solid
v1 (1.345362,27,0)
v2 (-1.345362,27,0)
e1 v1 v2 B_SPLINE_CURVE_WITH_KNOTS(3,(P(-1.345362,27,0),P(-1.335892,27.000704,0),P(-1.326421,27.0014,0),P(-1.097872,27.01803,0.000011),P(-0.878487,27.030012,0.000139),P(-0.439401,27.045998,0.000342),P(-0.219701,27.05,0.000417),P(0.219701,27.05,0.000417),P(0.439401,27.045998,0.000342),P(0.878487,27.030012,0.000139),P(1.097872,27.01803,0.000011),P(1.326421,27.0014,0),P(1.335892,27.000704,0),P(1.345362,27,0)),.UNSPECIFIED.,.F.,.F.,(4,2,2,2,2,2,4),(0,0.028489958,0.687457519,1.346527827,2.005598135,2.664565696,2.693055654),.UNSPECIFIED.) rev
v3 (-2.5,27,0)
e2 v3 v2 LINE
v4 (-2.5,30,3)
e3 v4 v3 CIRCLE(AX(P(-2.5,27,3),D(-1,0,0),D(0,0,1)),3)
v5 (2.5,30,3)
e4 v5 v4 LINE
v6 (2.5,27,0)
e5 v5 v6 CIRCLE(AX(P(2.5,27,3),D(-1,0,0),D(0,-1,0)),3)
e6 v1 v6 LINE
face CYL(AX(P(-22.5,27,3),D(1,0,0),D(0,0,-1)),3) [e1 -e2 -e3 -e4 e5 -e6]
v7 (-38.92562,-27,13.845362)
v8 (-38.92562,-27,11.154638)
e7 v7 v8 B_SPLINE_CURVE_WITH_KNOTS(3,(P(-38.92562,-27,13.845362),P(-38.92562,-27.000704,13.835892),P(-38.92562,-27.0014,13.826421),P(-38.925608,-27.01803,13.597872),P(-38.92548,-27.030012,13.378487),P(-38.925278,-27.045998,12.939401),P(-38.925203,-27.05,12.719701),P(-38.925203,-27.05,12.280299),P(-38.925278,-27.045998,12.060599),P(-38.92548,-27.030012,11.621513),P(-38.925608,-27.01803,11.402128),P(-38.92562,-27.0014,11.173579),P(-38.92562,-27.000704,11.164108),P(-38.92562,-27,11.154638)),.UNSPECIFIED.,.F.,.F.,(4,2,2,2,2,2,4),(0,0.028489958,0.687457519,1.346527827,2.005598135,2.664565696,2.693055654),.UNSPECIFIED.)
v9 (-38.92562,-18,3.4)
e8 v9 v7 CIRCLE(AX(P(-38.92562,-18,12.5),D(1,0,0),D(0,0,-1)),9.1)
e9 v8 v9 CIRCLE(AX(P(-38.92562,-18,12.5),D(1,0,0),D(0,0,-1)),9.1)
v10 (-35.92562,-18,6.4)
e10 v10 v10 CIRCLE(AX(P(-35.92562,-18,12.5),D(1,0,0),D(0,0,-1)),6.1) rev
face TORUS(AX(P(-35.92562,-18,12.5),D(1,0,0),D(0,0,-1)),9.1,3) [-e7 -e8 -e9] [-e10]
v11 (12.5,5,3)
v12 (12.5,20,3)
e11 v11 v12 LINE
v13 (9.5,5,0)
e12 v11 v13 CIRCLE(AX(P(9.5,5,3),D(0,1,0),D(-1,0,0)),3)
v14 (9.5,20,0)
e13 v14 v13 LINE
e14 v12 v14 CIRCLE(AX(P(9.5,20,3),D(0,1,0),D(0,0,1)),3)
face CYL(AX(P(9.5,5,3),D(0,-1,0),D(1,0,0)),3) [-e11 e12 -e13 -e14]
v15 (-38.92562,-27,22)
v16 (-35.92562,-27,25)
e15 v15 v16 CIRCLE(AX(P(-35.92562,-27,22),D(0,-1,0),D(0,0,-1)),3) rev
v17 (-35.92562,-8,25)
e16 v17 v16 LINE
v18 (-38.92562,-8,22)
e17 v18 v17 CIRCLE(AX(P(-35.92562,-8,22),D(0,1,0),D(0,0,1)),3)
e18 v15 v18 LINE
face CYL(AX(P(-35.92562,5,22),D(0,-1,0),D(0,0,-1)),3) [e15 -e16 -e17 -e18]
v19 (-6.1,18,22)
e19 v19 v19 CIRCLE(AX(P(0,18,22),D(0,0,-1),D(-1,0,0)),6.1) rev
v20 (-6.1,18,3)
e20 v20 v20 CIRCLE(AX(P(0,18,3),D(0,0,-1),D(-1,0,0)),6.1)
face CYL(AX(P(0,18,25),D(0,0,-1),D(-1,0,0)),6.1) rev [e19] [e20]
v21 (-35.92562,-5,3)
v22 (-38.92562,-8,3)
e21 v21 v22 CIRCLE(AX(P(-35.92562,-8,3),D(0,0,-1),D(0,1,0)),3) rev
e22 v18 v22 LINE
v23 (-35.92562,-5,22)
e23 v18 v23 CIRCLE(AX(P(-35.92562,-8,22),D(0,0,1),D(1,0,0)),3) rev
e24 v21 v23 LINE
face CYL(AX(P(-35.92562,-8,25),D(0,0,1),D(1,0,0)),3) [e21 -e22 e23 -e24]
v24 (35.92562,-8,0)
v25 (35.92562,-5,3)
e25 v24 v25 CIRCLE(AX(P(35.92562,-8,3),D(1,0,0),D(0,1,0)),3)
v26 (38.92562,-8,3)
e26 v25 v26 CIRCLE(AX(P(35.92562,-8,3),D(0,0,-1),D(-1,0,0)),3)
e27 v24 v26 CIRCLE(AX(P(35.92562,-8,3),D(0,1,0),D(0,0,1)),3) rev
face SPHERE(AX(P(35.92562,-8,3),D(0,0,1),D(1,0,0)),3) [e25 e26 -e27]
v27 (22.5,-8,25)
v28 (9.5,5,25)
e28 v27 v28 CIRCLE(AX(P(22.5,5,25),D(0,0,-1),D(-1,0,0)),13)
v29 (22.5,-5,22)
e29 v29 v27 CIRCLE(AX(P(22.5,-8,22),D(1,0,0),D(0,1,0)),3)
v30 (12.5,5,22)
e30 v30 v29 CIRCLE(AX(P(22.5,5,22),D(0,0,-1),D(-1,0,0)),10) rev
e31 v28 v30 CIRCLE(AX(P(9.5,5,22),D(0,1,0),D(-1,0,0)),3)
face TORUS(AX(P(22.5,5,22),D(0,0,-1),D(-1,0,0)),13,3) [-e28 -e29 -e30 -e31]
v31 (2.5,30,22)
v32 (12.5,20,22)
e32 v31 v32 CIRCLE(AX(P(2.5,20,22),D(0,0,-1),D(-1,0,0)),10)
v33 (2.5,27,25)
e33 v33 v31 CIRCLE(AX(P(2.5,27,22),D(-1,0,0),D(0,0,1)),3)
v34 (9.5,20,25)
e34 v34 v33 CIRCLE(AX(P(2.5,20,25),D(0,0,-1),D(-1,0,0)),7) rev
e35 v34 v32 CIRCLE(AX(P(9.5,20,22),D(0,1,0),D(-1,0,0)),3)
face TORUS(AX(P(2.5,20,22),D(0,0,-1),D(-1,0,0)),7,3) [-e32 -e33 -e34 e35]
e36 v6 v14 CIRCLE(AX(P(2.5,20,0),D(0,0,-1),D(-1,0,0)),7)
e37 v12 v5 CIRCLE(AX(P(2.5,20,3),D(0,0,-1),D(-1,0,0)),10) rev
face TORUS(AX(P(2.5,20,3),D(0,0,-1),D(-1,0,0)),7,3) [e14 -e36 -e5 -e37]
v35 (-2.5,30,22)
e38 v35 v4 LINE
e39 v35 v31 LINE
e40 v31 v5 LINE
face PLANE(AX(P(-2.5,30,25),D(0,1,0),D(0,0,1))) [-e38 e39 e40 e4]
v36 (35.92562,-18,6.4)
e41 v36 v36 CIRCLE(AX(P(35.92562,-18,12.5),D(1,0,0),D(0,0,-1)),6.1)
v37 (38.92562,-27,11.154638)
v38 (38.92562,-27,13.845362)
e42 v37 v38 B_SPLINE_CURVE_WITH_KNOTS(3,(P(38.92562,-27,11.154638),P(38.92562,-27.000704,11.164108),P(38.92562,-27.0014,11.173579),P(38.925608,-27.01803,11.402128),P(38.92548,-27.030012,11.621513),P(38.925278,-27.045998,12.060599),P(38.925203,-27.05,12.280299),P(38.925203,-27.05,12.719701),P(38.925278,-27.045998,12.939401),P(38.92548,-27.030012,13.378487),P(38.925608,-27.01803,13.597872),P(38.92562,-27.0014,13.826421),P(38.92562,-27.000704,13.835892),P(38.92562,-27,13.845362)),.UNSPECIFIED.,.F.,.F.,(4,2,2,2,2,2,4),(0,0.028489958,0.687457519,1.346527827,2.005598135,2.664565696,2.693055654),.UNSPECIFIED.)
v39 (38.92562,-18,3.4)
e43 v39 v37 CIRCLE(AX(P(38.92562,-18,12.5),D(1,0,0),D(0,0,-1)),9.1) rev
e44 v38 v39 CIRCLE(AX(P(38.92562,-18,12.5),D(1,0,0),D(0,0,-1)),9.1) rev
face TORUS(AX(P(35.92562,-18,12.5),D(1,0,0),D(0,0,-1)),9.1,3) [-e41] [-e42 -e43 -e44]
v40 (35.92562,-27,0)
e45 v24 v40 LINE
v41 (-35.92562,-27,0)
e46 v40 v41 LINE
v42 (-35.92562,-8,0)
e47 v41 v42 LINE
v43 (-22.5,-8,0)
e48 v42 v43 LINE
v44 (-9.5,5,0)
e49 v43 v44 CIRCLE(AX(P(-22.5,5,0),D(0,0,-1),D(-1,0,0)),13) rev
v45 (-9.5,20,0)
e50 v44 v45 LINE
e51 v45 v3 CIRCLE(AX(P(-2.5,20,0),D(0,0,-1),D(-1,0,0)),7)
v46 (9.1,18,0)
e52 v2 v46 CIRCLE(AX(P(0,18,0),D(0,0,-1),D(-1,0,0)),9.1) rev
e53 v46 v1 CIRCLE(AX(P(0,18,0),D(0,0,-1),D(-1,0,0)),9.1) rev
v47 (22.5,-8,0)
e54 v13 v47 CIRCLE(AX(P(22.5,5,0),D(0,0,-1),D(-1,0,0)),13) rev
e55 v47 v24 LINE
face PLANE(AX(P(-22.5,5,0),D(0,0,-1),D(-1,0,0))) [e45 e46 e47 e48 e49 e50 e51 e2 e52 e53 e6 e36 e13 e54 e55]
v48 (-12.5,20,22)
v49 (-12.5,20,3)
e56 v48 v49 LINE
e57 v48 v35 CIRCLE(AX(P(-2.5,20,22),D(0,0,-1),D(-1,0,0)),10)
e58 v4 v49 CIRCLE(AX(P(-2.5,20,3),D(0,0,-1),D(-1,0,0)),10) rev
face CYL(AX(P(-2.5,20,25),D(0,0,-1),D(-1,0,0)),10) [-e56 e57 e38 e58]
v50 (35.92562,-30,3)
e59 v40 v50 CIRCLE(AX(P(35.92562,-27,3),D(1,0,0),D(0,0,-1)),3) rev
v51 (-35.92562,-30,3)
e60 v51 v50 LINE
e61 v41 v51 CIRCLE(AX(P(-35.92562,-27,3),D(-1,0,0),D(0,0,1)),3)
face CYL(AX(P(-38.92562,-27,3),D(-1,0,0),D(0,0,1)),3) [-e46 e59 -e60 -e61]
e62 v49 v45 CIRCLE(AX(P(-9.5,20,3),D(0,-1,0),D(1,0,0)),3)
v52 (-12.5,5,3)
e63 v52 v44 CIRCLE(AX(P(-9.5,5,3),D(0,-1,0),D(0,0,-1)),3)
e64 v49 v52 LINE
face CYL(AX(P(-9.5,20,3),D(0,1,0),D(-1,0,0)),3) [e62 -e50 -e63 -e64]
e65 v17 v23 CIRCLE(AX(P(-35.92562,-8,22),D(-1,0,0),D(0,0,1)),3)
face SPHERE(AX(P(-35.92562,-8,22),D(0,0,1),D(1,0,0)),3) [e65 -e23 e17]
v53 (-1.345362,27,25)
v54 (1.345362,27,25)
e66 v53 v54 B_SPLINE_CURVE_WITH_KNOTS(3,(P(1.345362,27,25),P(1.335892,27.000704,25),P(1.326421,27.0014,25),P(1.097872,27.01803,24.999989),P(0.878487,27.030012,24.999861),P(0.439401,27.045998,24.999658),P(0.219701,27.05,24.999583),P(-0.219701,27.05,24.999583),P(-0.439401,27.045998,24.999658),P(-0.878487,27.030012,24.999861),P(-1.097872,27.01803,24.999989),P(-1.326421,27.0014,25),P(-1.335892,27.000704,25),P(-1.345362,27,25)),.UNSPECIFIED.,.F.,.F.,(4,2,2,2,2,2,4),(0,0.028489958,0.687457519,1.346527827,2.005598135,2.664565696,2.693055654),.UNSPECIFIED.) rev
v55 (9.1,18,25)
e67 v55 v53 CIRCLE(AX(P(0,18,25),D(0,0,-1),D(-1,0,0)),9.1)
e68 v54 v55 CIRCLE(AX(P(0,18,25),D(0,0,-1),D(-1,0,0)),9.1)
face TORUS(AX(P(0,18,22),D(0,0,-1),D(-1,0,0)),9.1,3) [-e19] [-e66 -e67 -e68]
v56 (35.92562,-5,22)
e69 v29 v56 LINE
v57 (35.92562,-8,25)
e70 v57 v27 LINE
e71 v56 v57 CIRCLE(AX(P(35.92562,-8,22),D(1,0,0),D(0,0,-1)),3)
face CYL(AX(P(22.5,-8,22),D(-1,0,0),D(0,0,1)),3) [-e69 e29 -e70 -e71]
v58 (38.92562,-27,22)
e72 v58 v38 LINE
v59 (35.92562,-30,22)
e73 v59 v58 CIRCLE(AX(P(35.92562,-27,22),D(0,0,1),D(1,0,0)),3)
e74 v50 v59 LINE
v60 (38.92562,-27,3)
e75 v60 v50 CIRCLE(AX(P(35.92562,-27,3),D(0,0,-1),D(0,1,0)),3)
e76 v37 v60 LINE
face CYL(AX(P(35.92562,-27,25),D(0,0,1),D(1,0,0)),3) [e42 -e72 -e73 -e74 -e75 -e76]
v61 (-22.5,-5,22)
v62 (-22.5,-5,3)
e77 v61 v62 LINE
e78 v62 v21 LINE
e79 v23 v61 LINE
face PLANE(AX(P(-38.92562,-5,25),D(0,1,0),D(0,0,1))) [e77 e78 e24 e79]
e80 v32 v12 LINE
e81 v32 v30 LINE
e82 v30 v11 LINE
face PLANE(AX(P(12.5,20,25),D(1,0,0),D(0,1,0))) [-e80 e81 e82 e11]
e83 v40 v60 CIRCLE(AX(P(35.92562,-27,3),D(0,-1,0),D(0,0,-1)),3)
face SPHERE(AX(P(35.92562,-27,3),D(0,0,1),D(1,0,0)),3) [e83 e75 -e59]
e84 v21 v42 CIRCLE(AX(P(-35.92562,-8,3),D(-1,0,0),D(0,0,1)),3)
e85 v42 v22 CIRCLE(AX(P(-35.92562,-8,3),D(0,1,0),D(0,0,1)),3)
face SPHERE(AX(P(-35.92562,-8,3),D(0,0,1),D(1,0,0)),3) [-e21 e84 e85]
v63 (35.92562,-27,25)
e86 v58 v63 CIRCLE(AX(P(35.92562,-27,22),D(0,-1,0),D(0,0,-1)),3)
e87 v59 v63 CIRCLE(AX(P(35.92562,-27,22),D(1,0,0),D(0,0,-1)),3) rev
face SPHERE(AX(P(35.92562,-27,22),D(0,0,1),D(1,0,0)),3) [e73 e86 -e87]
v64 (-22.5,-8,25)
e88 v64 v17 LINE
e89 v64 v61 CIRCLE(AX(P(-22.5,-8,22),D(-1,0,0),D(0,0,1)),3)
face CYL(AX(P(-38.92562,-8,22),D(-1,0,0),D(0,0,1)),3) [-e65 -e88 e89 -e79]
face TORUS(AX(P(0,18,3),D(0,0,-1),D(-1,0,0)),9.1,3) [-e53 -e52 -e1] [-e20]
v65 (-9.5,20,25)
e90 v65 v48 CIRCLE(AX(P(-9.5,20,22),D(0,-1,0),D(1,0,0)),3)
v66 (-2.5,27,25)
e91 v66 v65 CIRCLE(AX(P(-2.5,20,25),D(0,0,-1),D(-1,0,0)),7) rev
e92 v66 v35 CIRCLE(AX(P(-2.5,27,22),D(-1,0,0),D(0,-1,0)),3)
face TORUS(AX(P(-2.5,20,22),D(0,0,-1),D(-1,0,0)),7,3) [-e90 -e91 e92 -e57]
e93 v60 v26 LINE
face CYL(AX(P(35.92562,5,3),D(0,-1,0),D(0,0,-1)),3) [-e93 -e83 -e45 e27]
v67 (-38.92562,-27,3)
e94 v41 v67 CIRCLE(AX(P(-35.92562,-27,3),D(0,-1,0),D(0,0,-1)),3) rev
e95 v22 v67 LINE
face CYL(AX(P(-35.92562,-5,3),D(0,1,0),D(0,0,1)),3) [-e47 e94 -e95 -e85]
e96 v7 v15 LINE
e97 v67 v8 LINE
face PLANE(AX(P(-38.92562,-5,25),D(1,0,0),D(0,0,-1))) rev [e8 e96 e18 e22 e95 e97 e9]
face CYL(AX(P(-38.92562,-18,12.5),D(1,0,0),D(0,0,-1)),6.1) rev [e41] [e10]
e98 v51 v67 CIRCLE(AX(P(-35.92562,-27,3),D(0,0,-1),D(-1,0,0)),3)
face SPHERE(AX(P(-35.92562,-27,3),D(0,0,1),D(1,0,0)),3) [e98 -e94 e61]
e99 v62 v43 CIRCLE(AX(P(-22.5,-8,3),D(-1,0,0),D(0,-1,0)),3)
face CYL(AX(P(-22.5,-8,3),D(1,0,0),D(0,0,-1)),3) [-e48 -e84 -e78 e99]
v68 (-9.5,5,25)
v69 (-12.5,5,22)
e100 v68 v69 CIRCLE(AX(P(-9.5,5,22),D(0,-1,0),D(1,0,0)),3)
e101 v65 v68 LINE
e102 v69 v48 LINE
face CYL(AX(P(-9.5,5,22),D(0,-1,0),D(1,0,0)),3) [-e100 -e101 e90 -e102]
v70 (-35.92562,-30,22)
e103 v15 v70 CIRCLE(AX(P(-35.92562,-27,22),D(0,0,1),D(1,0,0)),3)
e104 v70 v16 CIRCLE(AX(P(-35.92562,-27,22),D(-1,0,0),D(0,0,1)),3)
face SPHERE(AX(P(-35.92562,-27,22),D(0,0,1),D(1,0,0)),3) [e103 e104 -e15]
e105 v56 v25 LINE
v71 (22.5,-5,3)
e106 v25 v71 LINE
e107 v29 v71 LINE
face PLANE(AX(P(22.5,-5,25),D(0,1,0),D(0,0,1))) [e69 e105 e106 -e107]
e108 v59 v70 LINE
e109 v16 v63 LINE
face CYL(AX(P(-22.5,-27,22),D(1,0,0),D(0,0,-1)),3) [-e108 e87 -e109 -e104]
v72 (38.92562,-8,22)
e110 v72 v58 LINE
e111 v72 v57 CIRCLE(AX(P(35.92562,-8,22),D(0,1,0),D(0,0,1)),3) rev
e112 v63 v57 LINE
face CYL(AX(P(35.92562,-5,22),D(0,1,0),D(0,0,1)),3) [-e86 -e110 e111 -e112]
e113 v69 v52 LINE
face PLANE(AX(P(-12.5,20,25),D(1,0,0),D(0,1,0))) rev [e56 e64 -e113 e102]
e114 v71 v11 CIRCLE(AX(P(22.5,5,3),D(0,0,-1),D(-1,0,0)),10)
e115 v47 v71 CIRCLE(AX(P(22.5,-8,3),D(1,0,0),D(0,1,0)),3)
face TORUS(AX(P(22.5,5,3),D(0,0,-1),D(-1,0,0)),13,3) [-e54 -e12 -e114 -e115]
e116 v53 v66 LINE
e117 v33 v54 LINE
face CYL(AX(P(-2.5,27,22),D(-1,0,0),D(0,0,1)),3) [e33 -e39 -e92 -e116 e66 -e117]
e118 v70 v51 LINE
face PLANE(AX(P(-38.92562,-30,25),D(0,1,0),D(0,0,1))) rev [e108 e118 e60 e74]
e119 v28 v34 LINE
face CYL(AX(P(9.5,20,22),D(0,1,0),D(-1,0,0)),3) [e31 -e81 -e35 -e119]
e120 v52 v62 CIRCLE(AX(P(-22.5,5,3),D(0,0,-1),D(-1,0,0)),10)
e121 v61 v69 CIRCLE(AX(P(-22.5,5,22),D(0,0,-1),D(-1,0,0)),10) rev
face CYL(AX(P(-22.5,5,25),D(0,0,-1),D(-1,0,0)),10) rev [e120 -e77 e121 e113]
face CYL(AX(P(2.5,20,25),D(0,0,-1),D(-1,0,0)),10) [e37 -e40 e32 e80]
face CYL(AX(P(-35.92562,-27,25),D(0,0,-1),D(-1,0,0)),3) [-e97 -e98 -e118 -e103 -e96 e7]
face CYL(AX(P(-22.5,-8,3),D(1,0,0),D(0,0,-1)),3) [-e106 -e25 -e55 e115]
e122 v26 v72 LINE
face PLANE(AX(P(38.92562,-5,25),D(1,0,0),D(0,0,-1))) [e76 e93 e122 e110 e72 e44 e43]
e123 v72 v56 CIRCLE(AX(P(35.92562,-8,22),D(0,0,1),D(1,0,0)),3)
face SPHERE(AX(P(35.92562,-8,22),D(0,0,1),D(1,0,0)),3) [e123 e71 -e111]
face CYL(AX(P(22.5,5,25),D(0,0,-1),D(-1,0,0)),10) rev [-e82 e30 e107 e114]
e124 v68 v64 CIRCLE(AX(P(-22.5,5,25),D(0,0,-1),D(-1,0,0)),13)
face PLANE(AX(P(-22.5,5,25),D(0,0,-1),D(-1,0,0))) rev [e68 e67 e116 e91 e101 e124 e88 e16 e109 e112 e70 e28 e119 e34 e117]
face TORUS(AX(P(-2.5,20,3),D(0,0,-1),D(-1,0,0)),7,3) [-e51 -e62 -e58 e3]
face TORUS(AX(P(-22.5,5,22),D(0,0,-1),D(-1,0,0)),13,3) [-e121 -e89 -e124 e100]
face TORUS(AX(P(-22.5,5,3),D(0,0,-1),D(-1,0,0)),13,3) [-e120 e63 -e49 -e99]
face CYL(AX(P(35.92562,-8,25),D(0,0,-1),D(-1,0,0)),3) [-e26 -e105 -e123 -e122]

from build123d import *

# Parameters (mm, degrees)
SKETCH1_R           = 6.1
BOSS_EXTRUDE1_DEPTH = 25
SKETCH2_R           = 6.1
CUT_EXTRUDE1_DEPTH  = 88.09658729287669
FILLET1_R           = 3


with BuildPart() as part:
    # Sketch1 → Boss-Extrude1 (new body)
    with BuildSketch(Plane.XY):
        with BuildLine():
            Line((22.500000000000078, -5.000000000000004), (38.925619834710695, -5.000000000000004))
            Line((38.925619834710695, -5.000000000000004), (38.925619834710695, -30.000000000000007))
            Line((38.925619834710695, -30.000000000000007), (-38.92561983471068, -30.000000000000007))
            Line((-38.92561983471068, -30.000000000000007), (-38.92561983471068, -5.000000000000004))
            Line((-38.92561983471068, -5.000000000000004), (-22.500000000000068, -5.000000000000004))
            ThreePointArc((-22.500000000000068, -5.000000000000004), (-15.42893218813452, -2.0710678118654817), (-12.499999999999995, 5.000000000000067))
            Line((-12.499999999999995, 5.000000000000067), (-12.499999999999998, 19.99999999999993))
            ThreePointArc((-12.499999999999998, 19.99999999999993), (-9.571067811865476, 27.071067811865476), (-2.4999999999999294, 30))
            Line((-2.4999999999999294, 30), (2.499999999999931, 30))
            ThreePointArc((2.499999999999931, 30), (9.571067811865479, 27.071067811865476), (12.500000000000002, 19.99999999999993))
            Line((12.500000000000002, 19.99999999999993), (12.500000000000005, 5.000000000000065))
            ThreePointArc((12.500000000000005, 5.000000000000065), (15.428932188134532, -2.0710678118654826), (22.500000000000078, -5.000000000000004))
        make_face()
        with Locations((3.04e-15, 18)):
            Circle(SKETCH1_R, mode=Mode.SUBTRACT)
    extrude(amount=BOSS_EXTRUDE1_DEPTH)

    # Sketch2 → Cut-Extrude1 (cut, through all)
    with BuildSketch(Plane(origin=(38.925619834710695, 0, 0), x_dir=(0, 0, -1), z_dir=(1, 0, 0))):
        with Locations((-12.499999999999998, -18.000000000000007)):
            Circle(SKETCH2_R)
    extrude(amount=-CUT_EXTRUDE1_DEPTH, mode=Mode.SUBTRACT)

    # Fillet1
    # the kernel refuses this fillet: 3 mm, written as the material it takes off along each edge
    with BuildSketch(Plane(origin=(-35.92561983471068, -8.000000000000004, 22), x_dir=(0, 1, 0), z_dir=(-1, 0, 0))) as fillet1_piece_1_section:
        Polygon((0, 0), (FILLET1_R, 0), (FILLET1_R, -FILLET1_R), (0, -FILLET1_R), align=None)
    fillet1_piece_1 = extrude(amount=FILLET1_R, mode=Mode.PRIVATE)
    fillet1_piece_1 = fillet1_piece_1 - Plane(origin=(-35.92561983471068, -8.000000000000004, 22), x_dir=(0, -0.7071067811865475, -0.7071067811865475), z_dir=(-1, 0, 0)) * Sphere(FILLET1_R, mode=Mode.PRIVATE)
    add(fillet1_piece_1, mode=Mode.SUBTRACT)
    with BuildSketch(Plane(origin=(35.925619834710695, -8.000000000000004, 3), x_dir=(1, 0, 0), z_dir=(0, 1, 0))) as fillet1_piece_2_section:
        Polygon((0, 0), (FILLET1_R, 0), (FILLET1_R, FILLET1_R), (0, FILLET1_R), align=None)
    fillet1_piece_2 = extrude(amount=FILLET1_R, mode=Mode.PRIVATE)
    fillet1_piece_2 = fillet1_piece_2 - Plane(origin=(35.925619834710695, -8.000000000000004, 3), x_dir=(-0.7071067811865475, 0, 0.7071067811865475), z_dir=(0, 1, 0)) * Sphere(FILLET1_R, mode=Mode.PRIVATE)
    add(fillet1_piece_2, mode=Mode.SUBTRACT)
    with BuildSketch(Plane(origin=(-35.92561983471068, -27.000000000000007, 22), x_dir=(0, 0, 1), z_dir=(-1, 0, 0))) as fillet1_piece_3_section:
        Polygon((0, 0), (FILLET1_R, 0), (FILLET1_R, -FILLET1_R), (0, -FILLET1_R), align=None)
    fillet1_piece_3 = extrude(amount=FILLET1_R, mode=Mode.PRIVATE)
    fillet1_piece_3 = fillet1_piece_3 - Plane(origin=(-35.92561983471068, -27.000000000000007, 22), x_dir=(0, 0.7071067811865475, -0.7071067811865475), z_dir=(-1, 0, 0)) * Sphere(FILLET1_R, mode=Mode.PRIVATE)
    add(fillet1_piece_3, mode=Mode.SUBTRACT)
    with BuildSketch(Plane(origin=(35.925619834710695, -27.000000000000007, 3), x_dir=(0, 0, -1), z_dir=(1, 0, 0))) as fillet1_piece_4_section:
        Polygon((0, 0), (FILLET1_R, 0), (FILLET1_R, -FILLET1_R), (0, -FILLET1_R), align=None)
    fillet1_piece_4 = extrude(amount=FILLET1_R, mode=Mode.PRIVATE)
    fillet1_piece_4 = fillet1_piece_4 - Plane(origin=(35.925619834710695, -27.000000000000007, 3), x_dir=(0, 0.7071067811865475, 0.7071067811865475), z_dir=(1, 0, 0)) * Sphere(FILLET1_R, mode=Mode.PRIVATE)
    add(fillet1_piece_4, mode=Mode.SUBTRACT)
    with BuildSketch(Plane(origin=(-35.92561983471068, -27.000000000000007, 3), x_dir=(0, 0, -1), z_dir=(-1, 0, 0))) as fillet1_piece_5_section:
        Polygon((0, 0), (FILLET1_R, 0), (FILLET1_R, FILLET1_R), (0, FILLET1_R), align=None)
    fillet1_piece_5 = extrude(amount=FILLET1_R, mode=Mode.PRIVATE)
    fillet1_piece_5 = fillet1_piece_5 - Plane(origin=(-35.92561983471068, -27.000000000000007, 3), x_dir=(0, 0.7071067811865475, 0.7071067811865475), z_dir=(-1, 0, 0)) * Sphere(FILLET1_R, mode=Mode.PRIVATE)
    add(fillet1_piece_5, mode=Mode.SUBTRACT)
    with BuildSketch(Plane(origin=(-35.92561983471068, -8.000000000000004, 3), x_dir=(0, 1, 0), z_dir=(-1, 0, 0))) as fillet1_piece_6_section:
        Polygon((0, 0), (FILLET1_R, 0), (FILLET1_R, FILLET1_R), (0, FILLET1_R), align=None)
    fillet1_piece_6 = extrude(amount=FILLET1_R, mode=Mode.PRIVATE)
    fillet1_piece_6 = fillet1_piece_6 - Plane(origin=(-35.92561983471068, -8.000000000000004, 3), x_dir=(0, -0.7071067811865475, 0.7071067811865475), z_dir=(-1, 0, 0)) * Sphere(FILLET1_R, mode=Mode.PRIVATE)
    add(fillet1_piece_6, mode=Mode.SUBTRACT)
    with BuildSketch(Plane(origin=(35.925619834710695, -27.000000000000007, 22), x_dir=(0, 0, 1), z_dir=(1, 0, 0))) as fillet1_piece_7_section:
        Polygon((0, 0), (FILLET1_R, 0), (FILLET1_R, FILLET1_R), (0, FILLET1_R), align=None)
    fillet1_piece_7 = extrude(amount=FILLET1_R, mode=Mode.PRIVATE)
    fillet1_piece_7 = fillet1_piece_7 - Plane(origin=(35.925619834710695, -27.000000000000007, 22), x_dir=(0, 0.7071067811865475, -0.7071067811865475), z_dir=(1, 0, 0)) * Sphere(FILLET1_R, mode=Mode.PRIVATE)
    add(fillet1_piece_7, mode=Mode.SUBTRACT)
    with BuildSketch(Plane(origin=(35.925619834710695, -8.000000000000004, 22), x_dir=(1, 0, 0), z_dir=(0, 1, 0))) as fillet1_piece_8_section:
        Polygon((0, 0), (FILLET1_R, 0), (FILLET1_R, -FILLET1_R), (0, -FILLET1_R), align=None)
    fillet1_piece_8 = extrude(amount=FILLET1_R, mode=Mode.PRIVATE)
    fillet1_piece_8 = fillet1_piece_8 - Plane(origin=(35.925619834710695, -8.000000000000004, 22), x_dir=(-0.7071067811865475, 0, -0.7071067811865475), z_dir=(0, 1, 0)) * Sphere(FILLET1_R, mode=Mode.PRIVATE)
    add(fillet1_piece_8, mode=Mode.SUBTRACT)
    with BuildSketch(Plane(origin=(-35.92561983471068, -5.000000000000004, 25), x_dir=(0, -1, 0), z_dir=(1, 0, 0))) as fillet1_piece_9:
        with BuildLine():
            CenterArc((FILLET1_R, FILLET1_R), FILLET1_R, 180, 90)
            Line((-8.9e-16, FILLET1_R), (0, 0))
            Line((0, 0), (FILLET1_R, 0))
        make_face()
    extrude(amount=13.425619834710613, mode=Mode.SUBTRACT)
    with BuildSketch(Plane(origin=(-2.499999999999999, 20, 0), x_dir=(-1, -7.11e-15, 0), z_dir=(7.11e-15, -1, 0))) as fillet1_piece_10:
        with BuildLine():
            CenterArc((10 - FILLET1_R, -FILLET1_R), FILLET1_R, 8.48e-15, 90)
            Line((10, -FILLET1_R), (10, 0))
            Line((10, 0), (10 - FILLET1_R, 0))
        make_face()
    revolve(axis=Axis((-2.499999999999999, 20, 0), (0, 0, -1)), revolution_arc=90.00000000000081, mode=Mode.SUBTRACT)
    with BuildSketch(Plane(origin=(-2.4999999999999294, 30, 0), x_dir=(0, -1, 0), z_dir=(1, 0, 0))) as fillet1_piece_11:
        with BuildLine():
            CenterArc((FILLET1_R, -FILLET1_R), FILLET1_R, 90, 90)
            Line((0, -FILLET1_R), (0, 0))
            Line((0, 0), (FILLET1_R, 0))
        make_face()
    extrude(amount=4.999999999999861, mode=Mode.SUBTRACT)
    with BuildSketch(Plane(origin=(2.500000000000006, 20.000000000000007, 0), x_dir=(-7.51e-15, 1, 0), z_dir=(-1, -7.51e-15, 0))) as fillet1_piece_12:
        with BuildLine():
            CenterArc((9.999999999999993 - FILLET1_R, -FILLET1_R), FILLET1_R, 8.48e-15, 90)
            Line((9.999999999999993, -FILLET1_R), (9.999999999999993, 0))
            Line((9.999999999999993, 0), (9.999999999999993 - FILLET1_R, 0))
        make_face()
    revolve(axis=Axis((2.500000000000006, 20.000000000000007, 0), (0, 0, -1)), revolution_arc=90.00000000000088, mode=Mode.SUBTRACT)
    with BuildSketch(Plane(origin=(12.500000000000002, 19.99999999999993, 0), x_dir=(-1, -2.4e-16, 0), z_dir=(2.4e-16, -1, 0))) as fillet1_piece_13:
        with BuildLine():
            CenterArc((FILLET1_R, -FILLET1_R), FILLET1_R, 90, 90)
            Line((0, -FILLET1_R), (0, 0))
            Line((0, 0), (FILLET1_R, 0))
        make_face()
    extrude(amount=14.999999999999865, mode=Mode.SUBTRACT)
    with BuildSketch(Plane(origin=(22.500000000000004, 4.999999999999995, 0), x_dir=(-1, 7.02e-15, 0), z_dir=(7.02e-15, 1, 0))) as fillet1_piece_14:
        with BuildLine():
            CenterArc((9.999999999999998 + FILLET1_R, FILLET1_R), FILLET1_R, 180, 90)
            Line((9.999999999999998 + FILLET1_R, -4.4e-16), (9.999999999999998, 0))
            Line((9.999999999999998, 0), (9.999999999999998, FILLET1_R))
        make_face()
    revolve(axis=Axis((22.500000000000004, 4.999999999999995, 0), (0, 0, 1)), revolution_arc=90.00000000000082, mode=Mode.SUBTRACT)
    with BuildSketch(Plane(origin=(22.500000000000078, -5.000000000000004, 0), x_dir=(0, 3e-16, 1), z_dir=(1, 0, 0))) as fillet1_piece_15:
        with BuildLine():
            CenterArc((FILLET1_R, FILLET1_R), FILLET1_R, 180, 90)
            Line((-1.33e-15, FILLET1_R), (0, 0))
            Line((0, 0), (FILLET1_R, 0))
        make_face()
    extrude(amount=13.425619834710616, mode=Mode.SUBTRACT)
    with BuildSketch(Plane(origin=(-38.92561983471068, -27.000000000000007, 25), x_dir=(1, 0, 0), z_dir=(0, 1, 0))) as fillet1_piece_16:
        with BuildLine():
            CenterArc((FILLET1_R, FILLET1_R), FILLET1_R, 180, 90)
            Line((0, FILLET1_R), (0, 0))
            Line((0, 0), (FILLET1_R, 0))
        make_face()
    extrude(amount=19.000000000000004, mode=Mode.SUBTRACT)
    with BuildSketch(Plane(origin=(38.925619834710695, -8.000000000000004, 0), x_dir=(0, 0, 1), z_dir=(0, -1, 0))) as fillet1_piece_17:
        with BuildLine():
            CenterArc((FILLET1_R, FILLET1_R), FILLET1_R, 180, 90)
            Line((-4.4e-16, FILLET1_R), (0, 0))
            Line((0, 0), (FILLET1_R, 0))
        make_face()
    extrude(amount=19.000000000000004, mode=Mode.SUBTRACT)
    with BuildSketch(Plane(origin=(35.925619834710695, -30.000000000000007, 0), x_dir=(0, 1, 0), z_dir=(-1, 0, 0))) as fillet1_piece_18:
        with BuildLine():
            CenterArc((FILLET1_R, -FILLET1_R), FILLET1_R, 90, 90)
            Line((0, -FILLET1_R), (0, 0))
            Line((0, 0), (FILLET1_R, 0))
        make_face()
    extrude(amount=71.85123966942137, mode=Mode.SUBTRACT)
    with BuildSketch(Plane(origin=(-38.92561983471068, -27.000000000000007, 0), x_dir=(1, 0, 0), z_dir=(0, 1, 0))) as fillet1_piece_19:
        with BuildLine():
            CenterArc((FILLET1_R, -FILLET1_R), FILLET1_R, 90, 90)
            Line((0, -FILLET1_R), (0, 0))
            Line((0, 0), (FILLET1_R, 0))
        make_face()
    extrude(amount=19.000000000000004, mode=Mode.SUBTRACT)
    with BuildSketch(Plane(origin=(-35.92561983471068, -5.000000000000004, 0), x_dir=(0, -1, 0), z_dir=(1, 0, 0))) as fillet1_piece_20:
        with BuildLine():
            CenterArc((FILLET1_R, -FILLET1_R), FILLET1_R, 90, 90)
            Line((-8.9e-16, -FILLET1_R), (0, 0))
            Line((0, 0), (FILLET1_R, 0))
        make_face()
    extrude(amount=13.425619834710613, mode=Mode.SUBTRACT)
    with BuildSketch(Plane(origin=(-22.499999999999993, 4.999999999999993, 0), x_dir=(-7.46e-15, -1, 0), z_dir=(-1, 7.46e-15, 0))) as fillet1_piece_21:
        with BuildLine():
            CenterArc((9.999999999999998 + FILLET1_R, FILLET1_R), FILLET1_R, 180, 90)
            Line((9.999999999999998, FILLET1_R), (9.999999999999998, 0))
            Line((9.999999999999998, 0), (9.999999999999998 + FILLET1_R, 0))
        make_face()
    revolve(axis=Axis((-22.499999999999993, 4.999999999999993, 0), (0, 0, 1)), revolution_arc=90.00000000000085, mode=Mode.SUBTRACT)
    with BuildSketch(Plane(origin=(-12.499999999999995, 5.000000000000067, 0), x_dir=(1, 2.4e-16, 0), z_dir=(-2.4e-16, 1, 0))) as fillet1_piece_22:
        with BuildLine():
            CenterArc((FILLET1_R, -FILLET1_R), FILLET1_R, 90, 90)
            Line((0, -FILLET1_R), (0, 0))
            Line((0, 0), (FILLET1_R, 0))
        make_face()
    extrude(amount=14.999999999999861, mode=Mode.SUBTRACT)
    with BuildSketch(Plane(origin=(35.925619834710695, -30.000000000000007, 25), x_dir=(0, 1, 0), z_dir=(-1, 0, 0))) as fillet1_piece_23:
        with BuildLine():
            CenterArc((FILLET1_R, FILLET1_R), FILLET1_R, 180, 90)
            Line((0, FILLET1_R), (0, 0))
            Line((0, 0), (FILLET1_R, 0))
        make_face()
    extrude(amount=71.85123966942137, mode=Mode.SUBTRACT)
    with BuildSketch(Plane(origin=(38.925619834710695, -8.000000000000004, 25), x_dir=(0, 0, -1), z_dir=(0, -1, 0))) as fillet1_piece_24:
        with BuildLine():
            CenterArc((FILLET1_R, -FILLET1_R), FILLET1_R, 90, 90)
            Line((0, -FILLET1_R), (0, 0))
            Line((0, 0), (FILLET1_R, 0))
        make_face()
    extrude(amount=19.000000000000004, mode=Mode.SUBTRACT)
    with BuildSketch(Plane(origin=(38.925619834710695, -5.000000000000004, 3), x_dir=(-1, 3e-16, 0), z_dir=(0, 0, 1))) as fillet1_piece_25:
        with BuildLine():
            CenterArc((FILLET1_R, FILLET1_R), FILLET1_R, 180, 90)
            Line((-8.9e-16, FILLET1_R), (0, 0))
            Line((0, 0), (FILLET1_R, 0))
        make_face()
    extrude(amount=19, mode=Mode.SUBTRACT)
    with BuildSketch(Plane(origin=(38.925619834710695, -30.000000000000007, 3), x_dir=(0, 1, 0), z_dir=(0, 0, 1))) as fillet1_piece_26:
        with BuildLine():
            CenterArc((FILLET1_R, FILLET1_R), FILLET1_R, 180, 90)
            Line((0, FILLET1_R), (0, 0))
            Line((0, 0), (FILLET1_R, 0))
        make_face()
    extrude(amount=19, mode=Mode.SUBTRACT)
    with BuildSketch(Plane(origin=(-38.92561983471068, -30.000000000000007, 3), x_dir=(1, 0, 0), z_dir=(0, 0, 1))) as fillet1_piece_27:
        with BuildLine():
            CenterArc((FILLET1_R, FILLET1_R), FILLET1_R, 180, 90)
            Line((0, FILLET1_R), (0, 0))
            Line((0, 0), (FILLET1_R, 0))
        make_face()
    extrude(amount=19, mode=Mode.SUBTRACT)
    with BuildSketch(Plane(origin=(-38.92561983471068, -5.000000000000004, 3), x_dir=(0, -1, 0), z_dir=(0, 0, 1))) as fillet1_piece_28:
        with BuildLine():
            CenterArc((FILLET1_R, FILLET1_R), FILLET1_R, 180, 90)
            Line((-8.9e-16, FILLET1_R), (0, 0))
            Line((0, 0), (FILLET1_R, 0))
        make_face()
    extrude(amount=19, mode=Mode.SUBTRACT)
    with BuildSketch(Plane(origin=(22.500000000000078, -5.000000000000004, 25), x_dir=(0, 3e-16, -1), z_dir=(1, 0, 0))) as fillet1_piece_29:
        with BuildLine():
            CenterArc((FILLET1_R, -FILLET1_R), FILLET1_R, 89.99999999999999, 90.00000000000001)
            Line((-8.9e-16, -FILLET1_R), (0, 0))
            Line((0, 0), (FILLET1_R, 0))
        make_face()
    extrude(amount=13.425619834710616, mode=Mode.SUBTRACT)
    with BuildSketch(Plane(origin=(22.500000000000004, 4.999999999999995, 25), x_dir=(-1, 7.02e-15, 0), z_dir=(7.02e-15, 1, 0))) as fillet1_piece_30:
        with BuildLine():
            CenterArc((9.999999999999998 + FILLET1_R, -FILLET1_R), FILLET1_R, 90, 90)
            Line((9.999999999999998 + FILLET1_R, 0), (9.999999999999998, 0))
            Line((9.999999999999998, 0), (9.999999999999998, -FILLET1_R))
        make_face()
    revolve(axis=Axis((22.500000000000004, 4.999999999999995, 25), (0, 0, 1)), revolution_arc=90.00000000000082, mode=Mode.SUBTRACT)
    with BuildSketch(Plane(origin=(12.500000000000002, 19.99999999999993, 25), x_dir=(-1, -2.4e-16, 0), z_dir=(2.4e-16, -1, 0))) as fillet1_piece_31:
        with BuildLine():
            CenterArc((FILLET1_R, FILLET1_R), FILLET1_R, 180, 90)
            Line((0, FILLET1_R), (0, 0))
            Line((0, 0), (FILLET1_R, 0))
        make_face()
    extrude(amount=14.999999999999865, mode=Mode.SUBTRACT)
    with BuildSketch(Plane(origin=(3.04e-15, 18, 0), x_dir=(1, 0, 0), z_dir=(0, -1, 0))) as fillet1_piece_32:
        with BuildLine():
            CenterArc((6.1 + FILLET1_R, FILLET1_R), FILLET1_R, 180, 90)
            Line((6.099999999999999, FILLET1_R), (6.1, 0))
            Line((6.1, 0), (6.1 + FILLET1_R, 0))
        make_face()
    revolve(axis=Axis((3.04e-15, 18, 0), (0, 0, 1)), mode=Mode.SUBTRACT)
    with BuildSketch(Plane(origin=(3.04e-15, 18, 25), x_dir=(1, 0, 0), z_dir=(0, -1, 0))) as fillet1_piece_33:
        with BuildLine():
            CenterArc((6.1 + FILLET1_R, -FILLET1_R), FILLET1_R, 90, 90)
            Line((6.099999999999999, -FILLET1_R), (6.1, 0))
            Line((6.1, 0), (6.1 + FILLET1_R, 0))
        make_face()
    revolve(axis=Axis((3.04e-15, 18, 25), (0, 0, 1)), mode=Mode.SUBTRACT)
    with BuildSketch(Plane(origin=(2.500000000000006, 20.000000000000007, 25), x_dir=(-7.51e-15, 1, 0), z_dir=(-1, -7.51e-15, 0))) as fillet1_piece_34:
        with BuildLine():
            CenterArc((9.999999999999993 - FILLET1_R, FILLET1_R), FILLET1_R, 270, 90)
            Line((9.999999999999993, FILLET1_R), (9.999999999999993, 0))
            Line((9.999999999999993, 0), (9.999999999999993 - FILLET1_R, 0))
        make_face()
    revolve(axis=Axis((2.500000000000006, 20.000000000000007, 25), (0, 0, -1)), revolution_arc=90.00000000000088, mode=Mode.SUBTRACT)
    with BuildSketch(Plane(origin=(-2.4999999999999294, 30, 25), x_dir=(0, -1, 0), z_dir=(1, 0, 0))) as fillet1_piece_35:
        with BuildLine():
            CenterArc((FILLET1_R, FILLET1_R), FILLET1_R, 180, 90)
            Line((0, FILLET1_R), (0, 0))
            Line((0, 0), (FILLET1_R, 0))
        make_face()
    extrude(amount=4.999999999999861, mode=Mode.SUBTRACT)
    with BuildSketch(Plane(origin=(-2.499999999999999, 20, 25), x_dir=(-1, -7.11e-15, 0), z_dir=(7.11e-15, -1, 0))) as fillet1_piece_36:
        with BuildLine():
            CenterArc((10 - FILLET1_R, FILLET1_R), FILLET1_R, 270, 90)
            Line((10, FILLET1_R), (10, 0))
            Line((10, 0), (10 - FILLET1_R, 0))
        make_face()
    revolve(axis=Axis((-2.499999999999999, 20, 25), (0, 0, -1)), revolution_arc=90.00000000000081, mode=Mode.SUBTRACT)
    with BuildSketch(Plane(origin=(-38.92561983471068, -18.000000000000007, 12.499999999999998), x_dir=(0, 0, -1), z_dir=(0, -1, 0))) as fillet1_piece_37:
        with BuildLine():
            CenterArc((6.1 + FILLET1_R, FILLET1_R), FILLET1_R, 180, 90)
            Line((6.1 + FILLET1_R, 0), (6.1, 0))
            Line((6.1, 0), (6.1, FILLET1_R))
        make_face()
    revolve(axis=Axis((-38.92561983471068, -18.000000000000007, 12.499999999999998), (1, 0, 0)), mode=Mode.SUBTRACT)
    with BuildSketch(Plane(origin=(38.925619834710695, -18.000000000000007, 12.499999999999998), x_dir=(0, 0, -1), z_dir=(0, -1, 0))) as fillet1_piece_38:
        with BuildLine():
            CenterArc((6.1 + FILLET1_R, -FILLET1_R), FILLET1_R, 90, 90)
            Line((6.1, -FILLET1_R), (6.1, 0))
            Line((6.1, 0), (6.1 + FILLET1_R, 0))
        make_face()
    revolve(axis=Axis((38.925619834710695, -18.000000000000007, 12.499999999999998), (1, 0, 0)), mode=Mode.SUBTRACT)
    with BuildSketch(Plane(origin=(-12.499999999999995, 5.000000000000067, 25), x_dir=(1, 2.4e-16, 0), z_dir=(-2.4e-16, 1, 0))) as fillet1_piece_39:
        with BuildLine():
            CenterArc((FILLET1_R, FILLET1_R), FILLET1_R, 180, 90)
            Line((0, FILLET1_R), (0, 0))
            Line((0, 0), (FILLET1_R, 0))
        make_face()
    extrude(amount=14.999999999999861, mode=Mode.SUBTRACT)
    with BuildSketch(Plane(origin=(-22.499999999999993, 4.999999999999993, 25), x_dir=(-7.46e-15, -1, 0), z_dir=(-1, 7.46e-15, 0))) as fillet1_piece_40:
        with BuildLine():
            CenterArc((9.999999999999998 + FILLET1_R, -FILLET1_R), FILLET1_R, 90, 90)
            Line((9.999999999999998, -FILLET1_R), (9.999999999999998, 0))
            Line((9.999999999999998, 0), (9.999999999999998 + FILLET1_R, 0))
        make_face()
    revolve(axis=Axis((-22.499999999999993, 4.999999999999993, 25), (0, 0, 1)), revolution_arc=90.00000000000085, mode=Mode.SUBTRACT)


solid = part.part
